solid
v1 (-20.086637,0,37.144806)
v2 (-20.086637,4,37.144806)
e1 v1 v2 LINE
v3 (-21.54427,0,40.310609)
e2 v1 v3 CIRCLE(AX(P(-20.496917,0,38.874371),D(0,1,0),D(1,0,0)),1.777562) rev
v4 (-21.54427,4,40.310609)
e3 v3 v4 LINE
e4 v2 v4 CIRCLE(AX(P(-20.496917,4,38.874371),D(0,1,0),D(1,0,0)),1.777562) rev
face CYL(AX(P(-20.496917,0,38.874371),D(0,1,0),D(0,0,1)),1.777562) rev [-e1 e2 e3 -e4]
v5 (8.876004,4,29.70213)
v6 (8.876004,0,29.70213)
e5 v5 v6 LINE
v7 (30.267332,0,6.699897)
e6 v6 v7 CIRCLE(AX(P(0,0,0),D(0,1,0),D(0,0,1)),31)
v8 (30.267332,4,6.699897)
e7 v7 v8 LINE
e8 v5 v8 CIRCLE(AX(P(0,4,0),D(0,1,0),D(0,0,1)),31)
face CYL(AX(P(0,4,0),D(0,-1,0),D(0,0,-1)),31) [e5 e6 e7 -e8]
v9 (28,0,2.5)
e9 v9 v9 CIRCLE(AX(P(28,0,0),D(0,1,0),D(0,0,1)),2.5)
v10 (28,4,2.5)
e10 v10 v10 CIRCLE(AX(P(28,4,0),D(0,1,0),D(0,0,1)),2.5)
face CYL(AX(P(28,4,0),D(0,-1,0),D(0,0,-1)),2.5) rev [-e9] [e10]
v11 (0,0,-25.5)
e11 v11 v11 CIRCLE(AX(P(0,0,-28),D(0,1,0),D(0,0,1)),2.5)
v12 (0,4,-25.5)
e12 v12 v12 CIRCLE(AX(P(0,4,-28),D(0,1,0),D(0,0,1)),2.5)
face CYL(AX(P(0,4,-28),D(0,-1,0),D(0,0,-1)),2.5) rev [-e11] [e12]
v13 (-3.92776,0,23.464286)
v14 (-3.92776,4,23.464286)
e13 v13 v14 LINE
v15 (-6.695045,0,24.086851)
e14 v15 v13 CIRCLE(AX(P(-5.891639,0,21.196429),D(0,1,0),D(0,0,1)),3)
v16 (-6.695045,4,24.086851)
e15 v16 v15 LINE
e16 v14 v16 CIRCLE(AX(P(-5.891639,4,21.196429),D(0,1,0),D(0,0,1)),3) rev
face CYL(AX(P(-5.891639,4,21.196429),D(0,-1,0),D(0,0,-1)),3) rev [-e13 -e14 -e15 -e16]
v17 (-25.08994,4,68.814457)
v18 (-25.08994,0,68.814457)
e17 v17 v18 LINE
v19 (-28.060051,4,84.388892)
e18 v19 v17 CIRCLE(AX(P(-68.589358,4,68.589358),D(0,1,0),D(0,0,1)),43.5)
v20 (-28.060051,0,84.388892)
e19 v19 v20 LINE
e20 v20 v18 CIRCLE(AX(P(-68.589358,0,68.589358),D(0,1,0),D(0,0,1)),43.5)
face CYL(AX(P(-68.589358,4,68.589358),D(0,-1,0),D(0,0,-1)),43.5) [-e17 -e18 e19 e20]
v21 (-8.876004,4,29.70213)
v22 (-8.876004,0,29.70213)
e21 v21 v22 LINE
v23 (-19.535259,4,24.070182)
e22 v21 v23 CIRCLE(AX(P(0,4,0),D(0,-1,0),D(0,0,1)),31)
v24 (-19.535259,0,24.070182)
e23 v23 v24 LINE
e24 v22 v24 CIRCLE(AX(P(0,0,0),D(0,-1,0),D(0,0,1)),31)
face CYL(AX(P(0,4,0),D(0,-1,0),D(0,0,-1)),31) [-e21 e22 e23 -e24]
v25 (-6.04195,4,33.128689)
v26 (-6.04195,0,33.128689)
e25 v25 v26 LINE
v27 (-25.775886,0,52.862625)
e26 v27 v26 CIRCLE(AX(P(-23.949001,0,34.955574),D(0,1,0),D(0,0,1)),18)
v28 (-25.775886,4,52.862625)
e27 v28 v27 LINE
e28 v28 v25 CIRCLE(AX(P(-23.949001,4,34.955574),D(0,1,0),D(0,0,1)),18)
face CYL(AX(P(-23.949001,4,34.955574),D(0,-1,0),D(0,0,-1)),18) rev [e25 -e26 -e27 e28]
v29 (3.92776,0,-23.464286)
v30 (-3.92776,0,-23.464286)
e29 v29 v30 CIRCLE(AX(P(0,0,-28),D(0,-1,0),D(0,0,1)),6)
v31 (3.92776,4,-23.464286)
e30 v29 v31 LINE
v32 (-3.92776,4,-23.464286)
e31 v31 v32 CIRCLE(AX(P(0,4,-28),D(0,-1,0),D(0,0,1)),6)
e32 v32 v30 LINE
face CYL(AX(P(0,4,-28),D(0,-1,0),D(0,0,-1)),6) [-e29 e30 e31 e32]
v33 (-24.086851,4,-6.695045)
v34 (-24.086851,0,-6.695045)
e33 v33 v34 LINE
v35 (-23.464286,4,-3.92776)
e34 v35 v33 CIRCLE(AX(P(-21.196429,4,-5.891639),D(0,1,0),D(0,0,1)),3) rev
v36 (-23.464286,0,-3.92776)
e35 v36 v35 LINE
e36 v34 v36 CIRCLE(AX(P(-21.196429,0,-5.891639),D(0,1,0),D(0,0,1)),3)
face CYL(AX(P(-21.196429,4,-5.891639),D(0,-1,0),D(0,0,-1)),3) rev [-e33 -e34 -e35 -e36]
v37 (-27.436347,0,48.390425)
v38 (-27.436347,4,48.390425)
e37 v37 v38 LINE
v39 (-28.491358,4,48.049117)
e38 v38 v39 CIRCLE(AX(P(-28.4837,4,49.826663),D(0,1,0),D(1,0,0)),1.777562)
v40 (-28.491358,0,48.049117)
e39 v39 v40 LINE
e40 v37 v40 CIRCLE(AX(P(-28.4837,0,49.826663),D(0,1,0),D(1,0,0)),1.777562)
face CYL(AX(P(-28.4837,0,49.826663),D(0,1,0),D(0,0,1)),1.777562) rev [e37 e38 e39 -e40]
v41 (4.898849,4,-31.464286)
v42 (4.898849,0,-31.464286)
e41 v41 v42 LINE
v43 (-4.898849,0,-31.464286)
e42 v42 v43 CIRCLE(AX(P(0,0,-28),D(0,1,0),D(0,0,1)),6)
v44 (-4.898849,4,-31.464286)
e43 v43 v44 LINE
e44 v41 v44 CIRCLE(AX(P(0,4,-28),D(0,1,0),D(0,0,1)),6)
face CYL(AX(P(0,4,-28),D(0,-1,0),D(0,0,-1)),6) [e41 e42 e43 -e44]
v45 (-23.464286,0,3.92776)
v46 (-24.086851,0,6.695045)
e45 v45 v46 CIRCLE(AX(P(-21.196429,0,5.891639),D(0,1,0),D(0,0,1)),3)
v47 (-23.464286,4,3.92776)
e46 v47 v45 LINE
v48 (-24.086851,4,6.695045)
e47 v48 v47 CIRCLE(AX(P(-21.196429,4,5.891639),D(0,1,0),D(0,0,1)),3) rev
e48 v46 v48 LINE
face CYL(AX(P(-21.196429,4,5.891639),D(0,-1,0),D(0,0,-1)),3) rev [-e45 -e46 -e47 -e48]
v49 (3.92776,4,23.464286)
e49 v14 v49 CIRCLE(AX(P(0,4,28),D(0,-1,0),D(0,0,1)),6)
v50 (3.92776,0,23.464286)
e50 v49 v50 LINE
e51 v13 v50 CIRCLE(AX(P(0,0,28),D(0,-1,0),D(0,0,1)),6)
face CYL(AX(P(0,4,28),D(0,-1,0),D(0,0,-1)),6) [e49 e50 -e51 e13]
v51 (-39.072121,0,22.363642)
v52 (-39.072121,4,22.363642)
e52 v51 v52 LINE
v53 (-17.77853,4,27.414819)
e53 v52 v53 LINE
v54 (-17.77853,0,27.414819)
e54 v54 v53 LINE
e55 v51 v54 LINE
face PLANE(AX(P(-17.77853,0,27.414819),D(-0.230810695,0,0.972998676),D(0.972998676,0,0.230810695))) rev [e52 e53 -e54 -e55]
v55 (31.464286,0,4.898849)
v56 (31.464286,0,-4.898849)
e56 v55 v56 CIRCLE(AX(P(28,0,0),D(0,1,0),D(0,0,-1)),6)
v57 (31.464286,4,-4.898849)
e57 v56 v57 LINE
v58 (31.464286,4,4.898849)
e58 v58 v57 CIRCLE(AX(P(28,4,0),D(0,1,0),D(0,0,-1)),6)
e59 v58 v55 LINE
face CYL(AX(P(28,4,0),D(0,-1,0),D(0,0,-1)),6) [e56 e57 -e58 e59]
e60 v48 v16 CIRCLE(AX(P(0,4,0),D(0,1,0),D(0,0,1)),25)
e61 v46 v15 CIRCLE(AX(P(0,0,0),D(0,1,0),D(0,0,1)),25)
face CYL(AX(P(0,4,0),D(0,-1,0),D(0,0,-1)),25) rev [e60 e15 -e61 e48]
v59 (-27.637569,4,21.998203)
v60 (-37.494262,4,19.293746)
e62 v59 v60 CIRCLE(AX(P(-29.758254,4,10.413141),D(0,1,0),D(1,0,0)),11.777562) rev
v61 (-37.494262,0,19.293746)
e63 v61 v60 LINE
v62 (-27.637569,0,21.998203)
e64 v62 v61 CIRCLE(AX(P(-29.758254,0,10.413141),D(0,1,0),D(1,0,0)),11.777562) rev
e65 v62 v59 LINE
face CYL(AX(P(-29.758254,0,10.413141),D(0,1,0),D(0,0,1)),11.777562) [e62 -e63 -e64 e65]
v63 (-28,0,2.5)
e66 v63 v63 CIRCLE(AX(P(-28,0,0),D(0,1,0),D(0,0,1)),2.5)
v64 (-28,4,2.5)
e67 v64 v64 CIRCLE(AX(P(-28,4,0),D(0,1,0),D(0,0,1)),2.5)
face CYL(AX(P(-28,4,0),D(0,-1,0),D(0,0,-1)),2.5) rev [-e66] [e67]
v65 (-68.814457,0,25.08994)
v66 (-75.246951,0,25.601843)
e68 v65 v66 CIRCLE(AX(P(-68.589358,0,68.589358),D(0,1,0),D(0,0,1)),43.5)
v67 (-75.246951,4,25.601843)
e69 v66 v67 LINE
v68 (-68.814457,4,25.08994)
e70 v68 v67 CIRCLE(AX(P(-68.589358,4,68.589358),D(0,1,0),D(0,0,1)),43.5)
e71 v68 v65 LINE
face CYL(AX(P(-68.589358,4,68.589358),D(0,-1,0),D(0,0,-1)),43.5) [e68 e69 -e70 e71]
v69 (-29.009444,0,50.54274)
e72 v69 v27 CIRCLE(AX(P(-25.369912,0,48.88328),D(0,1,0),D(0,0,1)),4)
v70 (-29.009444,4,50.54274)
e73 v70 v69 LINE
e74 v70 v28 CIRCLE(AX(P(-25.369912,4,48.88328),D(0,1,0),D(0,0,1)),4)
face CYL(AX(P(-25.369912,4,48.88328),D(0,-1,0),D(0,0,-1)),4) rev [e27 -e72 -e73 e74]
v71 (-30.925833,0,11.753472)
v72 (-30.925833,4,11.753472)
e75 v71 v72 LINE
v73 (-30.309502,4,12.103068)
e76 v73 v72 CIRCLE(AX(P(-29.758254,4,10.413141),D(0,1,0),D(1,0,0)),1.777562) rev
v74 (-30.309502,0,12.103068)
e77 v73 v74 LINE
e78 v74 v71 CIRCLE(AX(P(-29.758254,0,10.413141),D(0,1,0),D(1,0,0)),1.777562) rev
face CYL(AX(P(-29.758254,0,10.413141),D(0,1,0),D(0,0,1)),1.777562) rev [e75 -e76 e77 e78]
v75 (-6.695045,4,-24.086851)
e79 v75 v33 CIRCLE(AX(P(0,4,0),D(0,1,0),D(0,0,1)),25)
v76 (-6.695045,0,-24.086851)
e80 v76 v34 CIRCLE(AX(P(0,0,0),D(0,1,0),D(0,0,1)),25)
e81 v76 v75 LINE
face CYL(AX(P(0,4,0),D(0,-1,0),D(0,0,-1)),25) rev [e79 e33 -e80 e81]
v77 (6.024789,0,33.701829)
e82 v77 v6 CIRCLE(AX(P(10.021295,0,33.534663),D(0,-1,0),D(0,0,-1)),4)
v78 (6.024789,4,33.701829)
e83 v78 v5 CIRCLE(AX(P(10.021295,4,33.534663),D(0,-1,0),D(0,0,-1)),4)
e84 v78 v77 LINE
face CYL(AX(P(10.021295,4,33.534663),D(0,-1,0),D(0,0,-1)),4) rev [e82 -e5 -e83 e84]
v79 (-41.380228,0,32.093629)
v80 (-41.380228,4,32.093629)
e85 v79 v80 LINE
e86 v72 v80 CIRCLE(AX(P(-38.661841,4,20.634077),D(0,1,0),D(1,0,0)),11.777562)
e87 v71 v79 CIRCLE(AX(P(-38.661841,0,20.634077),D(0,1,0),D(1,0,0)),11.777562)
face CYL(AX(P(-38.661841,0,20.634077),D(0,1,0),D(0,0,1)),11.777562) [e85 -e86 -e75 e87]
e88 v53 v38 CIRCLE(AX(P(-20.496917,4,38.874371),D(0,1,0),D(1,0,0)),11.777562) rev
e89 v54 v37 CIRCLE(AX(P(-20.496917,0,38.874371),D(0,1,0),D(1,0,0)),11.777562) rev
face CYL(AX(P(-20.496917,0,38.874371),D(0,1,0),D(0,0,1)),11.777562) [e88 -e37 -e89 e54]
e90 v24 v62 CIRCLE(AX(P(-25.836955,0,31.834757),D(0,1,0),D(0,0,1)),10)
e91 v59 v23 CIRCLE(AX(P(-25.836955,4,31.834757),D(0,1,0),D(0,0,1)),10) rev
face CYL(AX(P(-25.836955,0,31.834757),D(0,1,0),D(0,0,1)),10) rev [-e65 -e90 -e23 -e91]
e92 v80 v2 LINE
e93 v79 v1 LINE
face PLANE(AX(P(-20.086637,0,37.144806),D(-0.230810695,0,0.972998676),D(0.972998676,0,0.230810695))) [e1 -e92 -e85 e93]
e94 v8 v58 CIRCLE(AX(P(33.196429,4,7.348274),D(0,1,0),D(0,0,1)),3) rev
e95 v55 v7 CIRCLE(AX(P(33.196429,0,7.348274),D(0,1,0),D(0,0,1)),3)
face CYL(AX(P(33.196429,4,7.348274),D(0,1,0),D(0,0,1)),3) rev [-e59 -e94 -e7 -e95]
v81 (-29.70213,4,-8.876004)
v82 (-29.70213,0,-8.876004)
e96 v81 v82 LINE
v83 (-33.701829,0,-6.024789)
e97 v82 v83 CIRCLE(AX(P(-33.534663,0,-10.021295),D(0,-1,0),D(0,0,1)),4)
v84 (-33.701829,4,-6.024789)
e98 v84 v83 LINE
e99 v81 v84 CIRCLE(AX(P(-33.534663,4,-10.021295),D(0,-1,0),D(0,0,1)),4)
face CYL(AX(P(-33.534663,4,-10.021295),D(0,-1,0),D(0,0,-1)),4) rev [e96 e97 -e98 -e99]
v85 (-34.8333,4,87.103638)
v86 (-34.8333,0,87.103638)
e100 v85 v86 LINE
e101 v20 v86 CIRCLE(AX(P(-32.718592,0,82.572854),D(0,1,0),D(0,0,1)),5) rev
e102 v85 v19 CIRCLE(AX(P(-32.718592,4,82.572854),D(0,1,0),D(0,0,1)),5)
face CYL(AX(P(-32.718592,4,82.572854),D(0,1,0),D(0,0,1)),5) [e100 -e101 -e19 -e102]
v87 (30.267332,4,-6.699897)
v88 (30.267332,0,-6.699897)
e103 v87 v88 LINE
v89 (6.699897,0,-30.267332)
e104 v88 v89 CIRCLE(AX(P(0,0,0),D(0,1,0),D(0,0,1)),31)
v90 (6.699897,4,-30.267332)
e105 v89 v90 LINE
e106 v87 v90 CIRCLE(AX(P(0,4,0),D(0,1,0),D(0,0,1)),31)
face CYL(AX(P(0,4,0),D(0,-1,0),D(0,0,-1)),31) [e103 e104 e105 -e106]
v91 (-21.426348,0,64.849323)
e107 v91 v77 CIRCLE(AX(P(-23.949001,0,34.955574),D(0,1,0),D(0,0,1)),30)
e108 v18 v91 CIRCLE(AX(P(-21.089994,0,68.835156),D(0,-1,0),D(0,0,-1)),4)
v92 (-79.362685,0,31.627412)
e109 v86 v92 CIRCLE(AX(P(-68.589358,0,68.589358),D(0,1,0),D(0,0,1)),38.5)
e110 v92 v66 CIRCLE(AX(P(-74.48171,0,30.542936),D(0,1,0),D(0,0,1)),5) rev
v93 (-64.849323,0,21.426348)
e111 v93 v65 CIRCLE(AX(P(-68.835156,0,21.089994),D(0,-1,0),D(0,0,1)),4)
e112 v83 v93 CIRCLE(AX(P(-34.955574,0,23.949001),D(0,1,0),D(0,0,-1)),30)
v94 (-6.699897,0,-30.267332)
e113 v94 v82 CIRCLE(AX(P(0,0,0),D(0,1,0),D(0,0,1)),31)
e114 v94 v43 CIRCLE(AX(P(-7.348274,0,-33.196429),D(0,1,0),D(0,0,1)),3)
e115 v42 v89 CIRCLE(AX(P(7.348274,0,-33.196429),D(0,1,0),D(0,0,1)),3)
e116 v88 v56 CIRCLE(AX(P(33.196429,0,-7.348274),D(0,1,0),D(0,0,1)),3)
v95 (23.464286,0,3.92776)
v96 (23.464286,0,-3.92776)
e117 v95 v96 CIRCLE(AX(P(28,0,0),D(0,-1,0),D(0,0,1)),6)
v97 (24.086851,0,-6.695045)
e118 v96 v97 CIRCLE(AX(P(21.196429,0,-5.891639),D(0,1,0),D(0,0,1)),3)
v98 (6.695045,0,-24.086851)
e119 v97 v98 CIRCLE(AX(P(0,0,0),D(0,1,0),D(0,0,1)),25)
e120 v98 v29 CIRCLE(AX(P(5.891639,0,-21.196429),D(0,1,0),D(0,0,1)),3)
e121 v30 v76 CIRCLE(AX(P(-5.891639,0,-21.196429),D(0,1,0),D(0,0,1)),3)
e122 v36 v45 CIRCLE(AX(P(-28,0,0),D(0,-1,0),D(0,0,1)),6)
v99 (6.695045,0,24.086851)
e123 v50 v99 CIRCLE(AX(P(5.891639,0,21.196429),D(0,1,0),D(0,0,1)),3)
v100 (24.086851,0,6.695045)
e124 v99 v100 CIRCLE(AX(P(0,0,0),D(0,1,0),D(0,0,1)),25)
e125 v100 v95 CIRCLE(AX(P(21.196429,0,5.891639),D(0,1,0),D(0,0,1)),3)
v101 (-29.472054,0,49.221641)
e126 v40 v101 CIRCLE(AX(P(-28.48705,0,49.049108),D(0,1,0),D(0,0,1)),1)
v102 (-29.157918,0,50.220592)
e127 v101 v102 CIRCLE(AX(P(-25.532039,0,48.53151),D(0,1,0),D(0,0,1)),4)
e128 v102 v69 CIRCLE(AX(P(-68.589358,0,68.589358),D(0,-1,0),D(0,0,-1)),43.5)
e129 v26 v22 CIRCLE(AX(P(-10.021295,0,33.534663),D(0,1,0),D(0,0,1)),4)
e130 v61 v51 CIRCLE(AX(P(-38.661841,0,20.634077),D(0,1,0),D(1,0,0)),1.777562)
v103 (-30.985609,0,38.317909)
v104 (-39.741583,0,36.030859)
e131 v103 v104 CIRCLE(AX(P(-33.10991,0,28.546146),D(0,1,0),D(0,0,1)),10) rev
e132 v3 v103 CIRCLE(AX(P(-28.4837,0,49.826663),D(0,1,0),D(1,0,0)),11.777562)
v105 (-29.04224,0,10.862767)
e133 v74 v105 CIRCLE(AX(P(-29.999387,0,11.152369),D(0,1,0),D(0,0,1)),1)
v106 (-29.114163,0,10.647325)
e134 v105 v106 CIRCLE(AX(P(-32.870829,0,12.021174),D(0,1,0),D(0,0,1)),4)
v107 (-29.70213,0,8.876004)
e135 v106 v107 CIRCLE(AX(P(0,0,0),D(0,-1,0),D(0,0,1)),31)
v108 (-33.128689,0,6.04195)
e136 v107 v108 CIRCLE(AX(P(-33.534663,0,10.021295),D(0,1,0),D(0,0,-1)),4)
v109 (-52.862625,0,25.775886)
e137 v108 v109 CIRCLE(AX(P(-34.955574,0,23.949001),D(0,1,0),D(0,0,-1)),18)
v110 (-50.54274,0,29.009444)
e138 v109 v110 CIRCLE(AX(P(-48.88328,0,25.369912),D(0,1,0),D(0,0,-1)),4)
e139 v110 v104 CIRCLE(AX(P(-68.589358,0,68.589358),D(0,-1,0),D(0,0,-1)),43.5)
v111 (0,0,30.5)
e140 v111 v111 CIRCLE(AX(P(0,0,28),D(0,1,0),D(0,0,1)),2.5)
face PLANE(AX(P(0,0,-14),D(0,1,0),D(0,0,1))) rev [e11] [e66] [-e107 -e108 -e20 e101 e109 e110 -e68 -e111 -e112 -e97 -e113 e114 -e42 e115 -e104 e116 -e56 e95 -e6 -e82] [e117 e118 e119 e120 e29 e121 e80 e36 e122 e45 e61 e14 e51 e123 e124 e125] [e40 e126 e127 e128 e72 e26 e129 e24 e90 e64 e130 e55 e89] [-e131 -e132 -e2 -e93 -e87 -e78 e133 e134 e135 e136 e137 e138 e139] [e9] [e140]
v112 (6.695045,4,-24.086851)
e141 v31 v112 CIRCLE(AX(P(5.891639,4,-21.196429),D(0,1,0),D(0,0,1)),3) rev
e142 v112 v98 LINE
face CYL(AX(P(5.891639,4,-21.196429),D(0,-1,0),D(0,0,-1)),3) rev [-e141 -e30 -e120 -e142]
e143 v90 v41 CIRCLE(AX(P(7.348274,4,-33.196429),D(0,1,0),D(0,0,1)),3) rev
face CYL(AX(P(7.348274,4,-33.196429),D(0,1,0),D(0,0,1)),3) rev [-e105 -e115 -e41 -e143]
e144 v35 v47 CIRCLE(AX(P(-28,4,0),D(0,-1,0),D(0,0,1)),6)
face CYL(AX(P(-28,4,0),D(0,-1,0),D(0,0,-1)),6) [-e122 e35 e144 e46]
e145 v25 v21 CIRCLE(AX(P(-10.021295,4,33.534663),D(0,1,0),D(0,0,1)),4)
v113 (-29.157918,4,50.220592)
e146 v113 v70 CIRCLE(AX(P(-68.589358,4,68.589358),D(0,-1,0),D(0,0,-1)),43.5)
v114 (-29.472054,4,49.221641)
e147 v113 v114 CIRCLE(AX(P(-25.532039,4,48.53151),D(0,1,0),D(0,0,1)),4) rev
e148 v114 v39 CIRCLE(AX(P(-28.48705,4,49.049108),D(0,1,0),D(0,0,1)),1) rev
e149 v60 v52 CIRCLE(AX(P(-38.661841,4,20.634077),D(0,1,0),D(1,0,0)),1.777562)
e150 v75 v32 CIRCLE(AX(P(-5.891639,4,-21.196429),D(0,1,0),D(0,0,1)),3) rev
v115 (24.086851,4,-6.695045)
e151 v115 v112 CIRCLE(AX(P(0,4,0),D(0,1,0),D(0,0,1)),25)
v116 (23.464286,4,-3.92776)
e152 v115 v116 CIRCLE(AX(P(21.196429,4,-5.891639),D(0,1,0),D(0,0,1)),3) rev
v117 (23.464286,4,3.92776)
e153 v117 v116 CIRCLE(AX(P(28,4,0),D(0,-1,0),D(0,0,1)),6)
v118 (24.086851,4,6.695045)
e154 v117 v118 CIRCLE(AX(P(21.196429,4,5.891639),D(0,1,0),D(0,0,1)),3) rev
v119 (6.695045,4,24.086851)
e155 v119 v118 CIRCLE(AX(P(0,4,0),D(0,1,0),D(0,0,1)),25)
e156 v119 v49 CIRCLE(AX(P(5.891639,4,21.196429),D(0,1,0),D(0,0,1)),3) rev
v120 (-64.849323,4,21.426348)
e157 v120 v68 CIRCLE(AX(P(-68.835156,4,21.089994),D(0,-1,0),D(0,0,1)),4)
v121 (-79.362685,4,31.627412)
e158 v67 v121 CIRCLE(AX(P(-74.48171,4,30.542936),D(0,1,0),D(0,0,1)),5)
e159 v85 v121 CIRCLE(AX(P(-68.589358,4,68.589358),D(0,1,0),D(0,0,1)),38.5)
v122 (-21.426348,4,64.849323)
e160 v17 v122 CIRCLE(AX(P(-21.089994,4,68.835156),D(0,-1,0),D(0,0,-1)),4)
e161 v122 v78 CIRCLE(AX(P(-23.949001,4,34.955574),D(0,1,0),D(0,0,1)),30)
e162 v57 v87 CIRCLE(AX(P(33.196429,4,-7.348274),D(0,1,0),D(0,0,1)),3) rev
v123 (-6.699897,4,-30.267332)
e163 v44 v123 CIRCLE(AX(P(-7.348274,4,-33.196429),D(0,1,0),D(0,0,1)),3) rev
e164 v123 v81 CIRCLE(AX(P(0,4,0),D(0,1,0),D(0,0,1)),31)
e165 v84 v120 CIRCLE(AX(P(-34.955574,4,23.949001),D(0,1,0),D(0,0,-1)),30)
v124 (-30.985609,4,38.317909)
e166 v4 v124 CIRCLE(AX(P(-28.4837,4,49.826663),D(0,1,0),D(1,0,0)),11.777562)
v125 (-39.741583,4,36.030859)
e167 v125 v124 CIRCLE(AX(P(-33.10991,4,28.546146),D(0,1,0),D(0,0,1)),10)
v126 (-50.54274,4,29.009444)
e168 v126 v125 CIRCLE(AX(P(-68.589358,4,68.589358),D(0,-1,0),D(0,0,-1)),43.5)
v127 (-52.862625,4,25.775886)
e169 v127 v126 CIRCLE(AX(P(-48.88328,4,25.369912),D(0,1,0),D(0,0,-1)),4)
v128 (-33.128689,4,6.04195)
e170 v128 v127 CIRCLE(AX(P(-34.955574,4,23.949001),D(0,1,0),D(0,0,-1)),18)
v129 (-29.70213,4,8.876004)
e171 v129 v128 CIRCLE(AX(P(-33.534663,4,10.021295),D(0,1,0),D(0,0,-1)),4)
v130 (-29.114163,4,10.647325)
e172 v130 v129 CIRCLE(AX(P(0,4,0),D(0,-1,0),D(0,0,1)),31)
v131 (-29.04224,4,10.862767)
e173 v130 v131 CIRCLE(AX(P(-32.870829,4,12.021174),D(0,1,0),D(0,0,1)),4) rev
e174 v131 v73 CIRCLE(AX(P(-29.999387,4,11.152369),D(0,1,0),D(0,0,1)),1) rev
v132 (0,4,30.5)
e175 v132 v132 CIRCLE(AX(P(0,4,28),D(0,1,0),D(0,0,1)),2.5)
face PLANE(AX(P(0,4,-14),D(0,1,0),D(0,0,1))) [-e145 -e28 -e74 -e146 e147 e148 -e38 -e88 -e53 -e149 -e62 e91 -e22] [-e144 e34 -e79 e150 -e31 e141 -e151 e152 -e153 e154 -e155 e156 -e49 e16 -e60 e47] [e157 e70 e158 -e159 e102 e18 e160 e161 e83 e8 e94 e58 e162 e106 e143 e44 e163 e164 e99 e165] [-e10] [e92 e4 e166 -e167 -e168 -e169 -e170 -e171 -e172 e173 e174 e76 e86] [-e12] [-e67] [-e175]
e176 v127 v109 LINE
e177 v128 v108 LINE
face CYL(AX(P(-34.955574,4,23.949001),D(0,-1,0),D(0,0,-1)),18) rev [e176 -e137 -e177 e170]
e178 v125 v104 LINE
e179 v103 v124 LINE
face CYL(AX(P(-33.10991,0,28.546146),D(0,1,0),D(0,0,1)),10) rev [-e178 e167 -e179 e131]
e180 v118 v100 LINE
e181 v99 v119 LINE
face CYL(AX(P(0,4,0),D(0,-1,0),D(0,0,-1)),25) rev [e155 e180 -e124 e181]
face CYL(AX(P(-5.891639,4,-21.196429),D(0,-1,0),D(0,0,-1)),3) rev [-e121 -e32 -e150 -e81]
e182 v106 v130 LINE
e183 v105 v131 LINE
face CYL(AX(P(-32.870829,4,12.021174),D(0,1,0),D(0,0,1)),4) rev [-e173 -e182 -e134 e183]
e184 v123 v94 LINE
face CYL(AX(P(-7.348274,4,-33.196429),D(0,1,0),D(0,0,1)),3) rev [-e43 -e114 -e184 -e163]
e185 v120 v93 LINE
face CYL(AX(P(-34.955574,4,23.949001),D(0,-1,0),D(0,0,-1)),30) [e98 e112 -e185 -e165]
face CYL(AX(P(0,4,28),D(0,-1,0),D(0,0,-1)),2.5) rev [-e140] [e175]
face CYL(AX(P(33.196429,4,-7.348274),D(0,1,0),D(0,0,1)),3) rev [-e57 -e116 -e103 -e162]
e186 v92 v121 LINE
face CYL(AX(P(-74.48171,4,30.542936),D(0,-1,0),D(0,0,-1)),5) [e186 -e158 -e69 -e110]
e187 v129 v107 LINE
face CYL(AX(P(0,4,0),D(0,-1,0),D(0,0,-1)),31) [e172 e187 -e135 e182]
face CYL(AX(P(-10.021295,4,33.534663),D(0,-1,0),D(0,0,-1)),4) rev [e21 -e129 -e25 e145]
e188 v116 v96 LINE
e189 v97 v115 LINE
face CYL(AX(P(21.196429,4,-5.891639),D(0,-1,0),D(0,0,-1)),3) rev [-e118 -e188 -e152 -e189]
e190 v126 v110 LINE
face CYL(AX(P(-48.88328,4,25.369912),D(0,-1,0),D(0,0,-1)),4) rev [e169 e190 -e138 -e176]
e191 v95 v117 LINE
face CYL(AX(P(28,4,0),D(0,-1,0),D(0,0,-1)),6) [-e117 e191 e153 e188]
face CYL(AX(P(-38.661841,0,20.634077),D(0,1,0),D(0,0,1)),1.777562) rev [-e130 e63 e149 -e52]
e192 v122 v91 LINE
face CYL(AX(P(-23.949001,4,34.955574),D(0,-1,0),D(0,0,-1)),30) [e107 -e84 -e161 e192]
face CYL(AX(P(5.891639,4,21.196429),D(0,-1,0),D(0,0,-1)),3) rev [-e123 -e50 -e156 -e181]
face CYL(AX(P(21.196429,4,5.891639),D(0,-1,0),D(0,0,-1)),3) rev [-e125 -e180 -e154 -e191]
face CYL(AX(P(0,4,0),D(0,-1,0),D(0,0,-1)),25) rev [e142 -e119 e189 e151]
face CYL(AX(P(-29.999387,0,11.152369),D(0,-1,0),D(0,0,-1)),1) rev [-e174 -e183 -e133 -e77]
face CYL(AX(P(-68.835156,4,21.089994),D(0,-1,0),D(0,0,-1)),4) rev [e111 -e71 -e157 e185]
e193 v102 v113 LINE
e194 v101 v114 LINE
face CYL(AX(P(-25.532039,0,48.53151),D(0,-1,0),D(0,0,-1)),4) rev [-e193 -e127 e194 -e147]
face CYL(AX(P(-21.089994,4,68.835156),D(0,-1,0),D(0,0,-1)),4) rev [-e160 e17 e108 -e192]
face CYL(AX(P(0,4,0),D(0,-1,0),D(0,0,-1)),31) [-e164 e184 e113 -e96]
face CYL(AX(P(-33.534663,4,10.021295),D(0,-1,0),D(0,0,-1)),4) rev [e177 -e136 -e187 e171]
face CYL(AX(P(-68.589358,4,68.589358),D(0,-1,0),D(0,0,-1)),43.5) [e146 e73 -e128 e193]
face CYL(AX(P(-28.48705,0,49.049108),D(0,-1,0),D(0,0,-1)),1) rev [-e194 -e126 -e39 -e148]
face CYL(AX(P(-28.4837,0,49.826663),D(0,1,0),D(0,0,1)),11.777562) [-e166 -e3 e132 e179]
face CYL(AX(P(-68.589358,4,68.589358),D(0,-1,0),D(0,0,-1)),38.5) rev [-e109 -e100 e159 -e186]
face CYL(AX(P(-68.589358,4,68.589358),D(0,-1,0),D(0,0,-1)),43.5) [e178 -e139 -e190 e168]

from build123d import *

# Parameters (mm, degrees)
SKETCH1_R           = 2.5
SKETCH1_R_2         = 38.5
BOSS_EXTRUDE1_DEPTH = 4
FILLET1_R           = 3
EXTRUDE_THIN1_DEPTH = 4
FILLET2_R           = 10
FILLET3_R           = 4
FILLET4_R           = 1
SKETCH3_R           = 64.024386015
CUT_EXTRUDE1_DEPTH  = 10
FILLET5_R           = 5
FILLET6_DEPTH       = 4


with BuildPart() as part:
    # Sketch1 → Boss-Extrude1 (new body)
    with BuildSketch(Plane(origin=(0, 0, 0), x_dir=(1, 0, 0), z_dir=(0, 1, 0))):
        with BuildLine():
            ThreePointArc((30.517857143, 5.446135824), (21.920310217, 21.920310217), (5.446135824, 30.517857143))
            ThreePointArc((5.446135824, 30.517857143), (0, 34), (-5.446135824, 30.517857143))
            ThreePointArc((-5.446135824, 30.517857143), (-20.638377106, 23.131307581), (-29.702130488, 8.876003857))
            ThreePointArc((-29.702130488, 8.876003857), (-31.212792428, 6.764161745), (-33.701829376, 6.02478926))
            ThreePointArc((-33.701829376, 6.02478926), (-54.791240945, -1.442417701), (-64.849322602, -21.426347583))
            ThreePointArc((-64.849322602, -21.426347583), (-66.120648036, -24.027926305), (-68.814456997, -25.089940189))
            ThreePointArc((-68.814456997, -25.089940189), (-99.348502757, -99.348502757), (-25.089940189, -68.814456997))
            ThreePointArc((-25.089940189, -68.814456997), (-24.027926305, -66.120648036), (-21.426347583, -64.849322602))
            ThreePointArc((-21.426347583, -64.849322602), (-1.442417701, -54.791240945), (6.02478926, -33.701829376))
            ThreePointArc((6.02478926, -33.701829376), (6.764161745, -31.212792428), (8.876003857, -29.702130488))
            ThreePointArc((8.876003857, -29.702130488), (23.131307581, -20.638377106), (30.517857143, -5.446135824))
            ThreePointArc((30.517857143, -5.446135824), (34, 0), (30.517857143, 5.446135824))
        make_face()
        with Locations(Location((0, 28, 0), (0, 0, 270))):
            Circle(SKETCH1_R, mode=Mode.SUBTRACT)
        with Locations(Location((28, 0, 0), (0, 0, 270))):
            Circle(SKETCH1_R, mode=Mode.SUBTRACT)
        with Locations(Location((0, -28, 0), (0, 0, 270))):
            Circle(SKETCH1_R, mode=Mode.SUBTRACT)
        with Locations(Location((-28, 0, 0), (0, 0, 270))):
            Circle(SKETCH1_R, mode=Mode.SUBTRACT)
        with Locations(Location((-68.589357775, -68.589357775, 0), (0, 0, 270))):
            Circle(SKETCH1_R_2, mode=Mode.SUBTRACT)
        with BuildLine():
            ThreePointArc((-24.517857143, -4.886172441), (-17.67766953, -17.67766953), (-4.886172441, -24.517857143))
            ThreePointArc((-4.886172441, -24.517857143), (0, -22), (4.886172441, -24.517857143))
            ThreePointArc((4.886172441, -24.517857143), (17.67766953, -17.67766953), (24.517857143, -4.886172441))
            ThreePointArc((24.517857143, -4.886172441), (22, 0), (24.517857143, 4.886172441))
            ThreePointArc((24.517857143, 4.886172441), (17.67766953, 17.67766953), (4.886172441, 24.517857143))
            ThreePointArc((4.886172441, 24.517857143), (0, 22), (-4.886172441, 24.517857143))
            ThreePointArc((-4.886172441, 24.517857143), (-17.67766953, 17.67766953), (-24.517857143, 4.886172441))
            ThreePointArc((-24.517857143, 4.886172441), (-22, 0), (-24.517857143, -4.886172441))
        make_face(mode=Mode.SUBTRACT)
        with BuildLine():
            ThreePointArc((-50.542739629, -29.009444012), (-37.830212793, -37.830212793), (-29.009444012, -50.542739629))
            ThreePointArc((-29.009444012, -50.542739629), (-27.701648922, -52.133357655), (-25.775886095, -52.862625259))
            ThreePointArc((-25.775886095, -52.862625259), (-11.221079312, -47.683495854), (-6.041949907, -33.128689072))
            ThreePointArc((-6.041949907, -33.128689072), (-6.938958159, -30.985310284), (-8.876003857, -29.702130488))
            ThreePointArc((-8.876003857, -29.702130488), (-21.920310217, -21.920310217), (-29.702130488, -8.876003857))
            ThreePointArc((-29.702130488, -8.876003857), (-30.985310284, -6.938958159), (-33.128689072, -6.041949907))
            ThreePointArc((-33.128689072, -6.041949907), (-47.683495854, -11.221079312), (-52.862625259, -25.775886095))
            ThreePointArc((-52.862625259, -25.775886095), (-52.133357655, -27.701648922), (-50.542739629, -29.009444012))
        make_face(mode=Mode.SUBTRACT)
    extrude(amount=BOSS_EXTRUDE1_DEPTH)

    # Fillet1
    fillet1_edges = [part.edges().sort_by_distance(p)[0] for p in [
        (5.446135824, 2, -30.517857143),
        (30.517857143, 2, -5.446135824),
        (30.517857143, 2, 5.446135824),
        (-5.446135824, 2, -30.517857143),
        (24.517857143, 2, -4.886172441),
        (4.886172441, 2, -24.517857143),
        (-4.886172441, 2, -24.517857143),
        (-24.517857143, 2, -4.886172441),
        (-24.517857143, 2, 4.886172441),
        (-4.886172441, 2, 24.517857143),
        (4.886172441, 2, 24.517857143),
        (24.517857143, 2, 4.886172441),
    ]]
    fillet(fillet1_edges, radius=FILLET1_R)

    # Sketch2 → Extrude-Thin1 (add)
    with BuildSketch(Plane(origin=(0, 4, 0), x_dir=(1, 0, 0), z_dir=(0, 1, 0))):
        with BuildLine():
            Line((-32.237774047, -50.35980695), (-29.529509942, -48.389301254))
            ThreePointArc((-29.529509942, -48.389301254), (-28.482745443, -48.04910113), (-27.43634696, -48.390425395))
            ThreePointArc((-27.43634696, -48.390425395), (-9.798865492, -43.800084833), (-17.778530097, -27.414819141))
            Line((-17.778530097, -27.414819141), (-39.072120949, -22.36364217))
            ThreePointArc((-39.072120949, -22.36364217), (-40.242802597, -19.82149687), (-37.49426164, -19.293746119))
            ThreePointArc((-37.49426164, -19.293746119), (-30.900503465, -22.135181432), (-23.882232512, -20.620165146))
            Line((-23.882232512, -20.620165146), (-21.436410838, -19.212144584))
            Line((-21.436410838, -19.212144584), (-26.425576805, -10.545644543))
            Line((-26.425576805, -10.545644543), (-28.871398479, -11.953665105))
            ThreePointArc((-28.871398479, -11.953665105), (-29.930650966, -12.182323243), (-30.925832655, -11.753471545))
            ThreePointArc((-30.925832655, -11.753471545), (-49.13679313, -15.250180603), (-41.380227899, -32.093628928))
            Line((-41.380227899, -32.093628928), (-20.086637047, -37.144805898))
            ThreePointArc((-20.086637047, -37.144805898), (-18.882283492, -39.617798683), (-21.5442705, -40.310608876))
            ThreePointArc((-21.5442705, -40.310608876), (-28.477374908, -38.049102572), (-35.412904416, -40.303160675))
            Line((-35.412904416, -40.303160675), (-38.121168521, -42.273666371))
            Line((-38.121168521, -42.273666371), (-32.237774047, -50.35980695))
        make_face()
    extrude(amount=-EXTRUDE_THIN1_DEPTH)

    # Fillet2
    fillet2_edges = [part.edges().sort_by_distance(p)[0] for p in [
        (-23.394596499, 2, 20.339440864),
    ]]
    fillet(fillet2_edges, radius=FILLET2_R)

    # Fillet3
    # the kernel refuses this fillet: 4 mm, written as the material it adds along each edge
    with BuildSketch(Plane(origin=(-28.654487562, 4, 11.828792947), x_dir=(-0.3625938431900147, 0, -0.9319472650749584), z_dir=(0, -1, 0))) as fillet3_piece_1:
        with BuildLine():
            CenterArc((1.34953067, -3.999163717), FILLET3_R, 91.171633345, 19.12091028)
            Line((-0.037723703, -0.247427412), (-0.065468791, -0.172392686))
            ThreePointArc((-0.065468791, -0.172392686), (-0.097947947, -0.111655946), (-0.079086095, 0.01205776))
            Line((-0.079086095, 0.01205776), (0.001635795, 0.079983274))
            ThreePointArc((0.001635795, 0.079983274), (0.633870466, 0.07351881), (1.266105138, 0.079983274))
            Line((1.266105138, 0.079983274), (1.267740932, 0))
        make_face()
    extrude(amount=4)
    with BuildSketch(Plane(origin=(-29.917309098, 4, 48.671460016), x_dir=(0.8086140578930259, 0, -0.5883394474092097), z_dir=(0, -1, 0))) as fillet3_piece_2:
        with BuildLine():
            CenterArc((3.628329627, 2.4668618), FILLET3_R, 191.061242736, 27.015431221)
            Line((-0.29736105, 1.69942926), (-0.375874864, 1.684080609))
            ThreePointArc((-0.375874864, 1.684080609), (-0.219057332, 0.837400307), (-0.079060684, -0.012223264))
            Line((-0.079060684, -0.012223264), (0, -0.08))
            ThreePointArc((0, -0.08), (0.23979249, -0.08), (0.416610086, -0.049337236))
            Line((0.416610086, -0.049337236), (0.479584979, 0))
        make_face()
    extrude(amount=4)

    # Fillet4
    fillet4_edges = [part.edges().sort_by_distance(p)[0] for p in [
        (-28.871398479, 2, 11.953665105),
        (-29.529509942, 2, 48.389301254),
    ]]
    fillet(fillet4_edges, radius=FILLET4_R)

    # Sketch3 → Cut-Extrude1 (cut)
    with BuildSketch(Plane(origin=(0, 4, 0), x_dir=(1, 0, 0), z_dir=(0, 1, 0))):
        with Locations((-98.613587898, -92.689059133)):
            Circle(SKETCH3_R)
    extrude(amount=-CUT_EXTRUDE1_DEPTH, mode=Mode.SUBTRACT)

    # Fillet5
    # the kernel refuses this fillet: 5 mm, written as the material it takes off along each edge
    with BuildSketch(Plane(origin=(-34.665740184, 37.003417613, 95.818720043), x_dir=(0.5003791783842261, 0, -0.865806374335236), z_dir=(0, -1, 0))) as fillet5_piece_1:
        with BuildLine():
            CenterArc((12.44266779, -4.94210233), FILLET5_R, 81.272233046, 93.723124761)
            Line((7.461729623, -4.505920051), (7.36211086, -4.497196406))
            ThreePointArc((7.36211086, -4.497196406), (3.755943973, -2.211429345), (-0.045745837, -0.088923104))
            Line((-0.045745837, -0.088923104), (-0.015173985, 0.098842047))
            ThreePointArc((-0.015173985, 0.098842047), (6.600683523, 0.603709729), (13.21654103, 0.098842047))
            Line((13.21654103, 0.098842047), (13.201367045, 0))
        make_face()
    extrude(amount=70.006835226, mode=Mode.SUBTRACT)
    with BuildSketch(Plane(origin=(-87.835142464, 37.003417613, 29.578464787), x_dir=(0.9719808160710193, 0, 0.23506019056810815), z_dir=(0, -1, 0))) as fillet5_piece_2:
        with BuildLine():
            CenterArc((13.205988808, -2.20141245), FILLET5_R, 153.878093502, 93.723124761)
            Line((11.300735218, -6.82418313), (11.262630146, -6.916638544))
            ThreePointArc((11.262630146, -6.916638544), (5.338291917, -3.928883786), (-0.064083773, -0.076767636))
            Line((-0.064083773, -0.076767636), (0.006807322, 0.099768033))
            ThreePointArc((0.006807322, 0.099768033), (4.358346145, -0.048515583), (8.62690636, 0.044028249))
            Line((8.62690636, 0.044028249), (8.71669229, 0))
        make_face()
    extrude(amount=70.006835226, mode=Mode.SUBTRACT)

    # Fillet6: read off the stored shape, not the designer's step
    # Fillet6 outline → Fillet6 (add)
    with BuildSketch(Plane(origin=(0, 0, 0), x_dir=(1, 0, 0), z_dir=(0, 1, 0))):
        with BuildLine():
            ThreePointArc((-30.985608924, -38.317908864), (-35.637111816, -38.221540359), (-39.741582528, -36.03085868))
            ThreePointArc((-39.741582528, -36.03085868), (-37.541405134, -38.121757988), (-35.492388329, -40.36099237))
            Line((-35.492388329, -40.36099237), (-35.412904416, -40.303160675))
            ThreePointArc((-35.412904416, -40.303160675), (-33.302598309, -39.080073338), (-30.985608924, -38.317908864))
        make_face()
    extrude(amount=FILLET6_DEPTH)


solid = part.part
